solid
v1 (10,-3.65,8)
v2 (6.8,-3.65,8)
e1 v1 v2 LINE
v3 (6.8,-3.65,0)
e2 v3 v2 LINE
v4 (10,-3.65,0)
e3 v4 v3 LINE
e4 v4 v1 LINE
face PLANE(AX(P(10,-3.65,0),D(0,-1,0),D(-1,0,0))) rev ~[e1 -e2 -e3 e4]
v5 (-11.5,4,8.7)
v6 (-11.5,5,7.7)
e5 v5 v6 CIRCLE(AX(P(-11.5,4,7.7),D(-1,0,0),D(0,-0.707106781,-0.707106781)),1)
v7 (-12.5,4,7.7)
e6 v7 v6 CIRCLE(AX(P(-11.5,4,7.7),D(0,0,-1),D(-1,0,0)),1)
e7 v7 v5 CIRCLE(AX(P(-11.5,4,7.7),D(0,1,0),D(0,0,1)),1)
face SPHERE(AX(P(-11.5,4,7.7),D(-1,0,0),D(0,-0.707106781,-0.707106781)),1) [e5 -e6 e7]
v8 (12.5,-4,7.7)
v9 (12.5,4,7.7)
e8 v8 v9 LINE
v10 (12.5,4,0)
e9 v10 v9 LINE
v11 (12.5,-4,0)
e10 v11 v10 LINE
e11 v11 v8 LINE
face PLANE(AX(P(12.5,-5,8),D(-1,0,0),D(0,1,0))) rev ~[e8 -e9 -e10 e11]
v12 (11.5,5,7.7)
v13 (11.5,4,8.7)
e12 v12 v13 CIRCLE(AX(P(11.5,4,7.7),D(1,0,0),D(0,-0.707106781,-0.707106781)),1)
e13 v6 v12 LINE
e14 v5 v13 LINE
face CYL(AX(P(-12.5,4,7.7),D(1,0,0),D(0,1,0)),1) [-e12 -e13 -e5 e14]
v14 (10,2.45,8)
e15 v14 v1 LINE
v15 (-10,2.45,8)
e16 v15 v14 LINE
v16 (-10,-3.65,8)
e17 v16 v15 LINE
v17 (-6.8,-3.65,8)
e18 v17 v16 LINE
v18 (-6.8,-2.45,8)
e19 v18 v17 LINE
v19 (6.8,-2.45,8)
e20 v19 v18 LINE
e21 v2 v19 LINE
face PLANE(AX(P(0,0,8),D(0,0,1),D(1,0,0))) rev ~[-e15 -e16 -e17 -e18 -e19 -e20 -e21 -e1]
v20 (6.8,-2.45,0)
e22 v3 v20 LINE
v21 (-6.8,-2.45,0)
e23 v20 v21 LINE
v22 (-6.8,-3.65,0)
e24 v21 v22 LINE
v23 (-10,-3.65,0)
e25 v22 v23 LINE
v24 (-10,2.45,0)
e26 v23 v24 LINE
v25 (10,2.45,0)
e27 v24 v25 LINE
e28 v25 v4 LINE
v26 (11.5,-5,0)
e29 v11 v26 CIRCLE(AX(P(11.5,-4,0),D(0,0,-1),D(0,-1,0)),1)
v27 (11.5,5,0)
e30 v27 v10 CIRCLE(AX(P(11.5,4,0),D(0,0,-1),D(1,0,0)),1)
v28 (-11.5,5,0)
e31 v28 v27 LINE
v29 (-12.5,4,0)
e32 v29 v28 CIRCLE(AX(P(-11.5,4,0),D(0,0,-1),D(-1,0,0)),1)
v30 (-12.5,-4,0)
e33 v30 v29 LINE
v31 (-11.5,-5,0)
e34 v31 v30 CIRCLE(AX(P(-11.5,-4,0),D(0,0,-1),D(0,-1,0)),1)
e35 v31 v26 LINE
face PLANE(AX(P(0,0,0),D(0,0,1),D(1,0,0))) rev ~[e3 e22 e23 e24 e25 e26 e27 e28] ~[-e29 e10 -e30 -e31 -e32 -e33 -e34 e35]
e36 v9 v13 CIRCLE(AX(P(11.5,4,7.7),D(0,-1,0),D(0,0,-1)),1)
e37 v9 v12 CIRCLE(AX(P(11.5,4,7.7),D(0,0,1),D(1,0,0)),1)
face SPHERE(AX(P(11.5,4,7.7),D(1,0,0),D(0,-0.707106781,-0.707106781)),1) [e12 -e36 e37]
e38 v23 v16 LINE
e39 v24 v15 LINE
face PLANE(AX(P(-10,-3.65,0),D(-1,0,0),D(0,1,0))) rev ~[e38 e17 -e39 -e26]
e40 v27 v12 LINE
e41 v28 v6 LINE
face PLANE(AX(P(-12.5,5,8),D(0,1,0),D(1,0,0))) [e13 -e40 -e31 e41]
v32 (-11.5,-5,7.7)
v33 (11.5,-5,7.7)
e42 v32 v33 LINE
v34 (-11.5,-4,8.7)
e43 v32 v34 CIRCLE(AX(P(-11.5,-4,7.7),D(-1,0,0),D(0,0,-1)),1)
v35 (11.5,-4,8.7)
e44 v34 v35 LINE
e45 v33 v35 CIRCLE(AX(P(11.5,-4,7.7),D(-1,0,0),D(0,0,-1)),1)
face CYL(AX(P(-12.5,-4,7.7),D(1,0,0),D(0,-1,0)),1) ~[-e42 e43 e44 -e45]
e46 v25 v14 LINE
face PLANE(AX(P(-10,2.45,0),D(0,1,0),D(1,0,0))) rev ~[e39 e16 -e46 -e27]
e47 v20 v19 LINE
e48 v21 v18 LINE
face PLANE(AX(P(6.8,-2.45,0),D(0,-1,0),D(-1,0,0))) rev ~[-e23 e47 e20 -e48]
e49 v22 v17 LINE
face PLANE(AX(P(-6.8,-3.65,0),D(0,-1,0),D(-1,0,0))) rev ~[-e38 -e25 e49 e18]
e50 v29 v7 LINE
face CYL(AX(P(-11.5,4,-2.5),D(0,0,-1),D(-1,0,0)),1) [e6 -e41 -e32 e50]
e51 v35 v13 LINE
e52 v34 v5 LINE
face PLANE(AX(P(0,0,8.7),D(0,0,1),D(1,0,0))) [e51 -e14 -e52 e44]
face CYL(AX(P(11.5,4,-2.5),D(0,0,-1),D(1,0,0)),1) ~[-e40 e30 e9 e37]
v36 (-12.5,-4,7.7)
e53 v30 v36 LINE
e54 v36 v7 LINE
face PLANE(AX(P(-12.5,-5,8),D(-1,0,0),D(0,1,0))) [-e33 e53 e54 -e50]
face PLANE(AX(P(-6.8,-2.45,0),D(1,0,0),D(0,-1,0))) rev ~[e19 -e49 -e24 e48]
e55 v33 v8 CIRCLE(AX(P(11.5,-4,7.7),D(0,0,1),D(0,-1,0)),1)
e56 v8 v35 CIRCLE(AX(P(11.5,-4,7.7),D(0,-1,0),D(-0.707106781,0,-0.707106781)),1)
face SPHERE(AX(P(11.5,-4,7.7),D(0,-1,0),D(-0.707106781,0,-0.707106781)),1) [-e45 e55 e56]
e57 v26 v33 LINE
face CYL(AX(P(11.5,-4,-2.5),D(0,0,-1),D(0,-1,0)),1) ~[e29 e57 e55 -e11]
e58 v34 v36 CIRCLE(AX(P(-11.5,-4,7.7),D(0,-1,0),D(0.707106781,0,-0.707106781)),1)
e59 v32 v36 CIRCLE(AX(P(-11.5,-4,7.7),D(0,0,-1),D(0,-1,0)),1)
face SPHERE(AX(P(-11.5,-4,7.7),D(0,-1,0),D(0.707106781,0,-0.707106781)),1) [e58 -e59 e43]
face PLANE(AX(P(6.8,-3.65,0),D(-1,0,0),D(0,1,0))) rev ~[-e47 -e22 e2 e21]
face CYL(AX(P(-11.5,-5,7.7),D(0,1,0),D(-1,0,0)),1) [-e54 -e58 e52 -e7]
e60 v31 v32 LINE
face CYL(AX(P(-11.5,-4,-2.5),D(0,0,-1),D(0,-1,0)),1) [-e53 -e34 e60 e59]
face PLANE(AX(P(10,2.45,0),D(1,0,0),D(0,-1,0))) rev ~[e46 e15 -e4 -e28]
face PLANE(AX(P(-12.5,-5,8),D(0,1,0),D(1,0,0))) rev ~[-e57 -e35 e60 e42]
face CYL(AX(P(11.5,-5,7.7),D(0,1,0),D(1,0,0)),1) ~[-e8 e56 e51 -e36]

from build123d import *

# Parameters (mm, degrees)
F0_W         = 25
F0_H         = 10
F1_DEPTH     = 8
F2_W         = 25
F2_H         = 10
F3_DEPTH     = 0.7
F4_R         = 1
F5_T1_DEPTH  = 10.2
F5_S5_W      = 1
F5_S5_H      = 1
F5_T6_DEPTH  = 1
F6_T1_DEPTH  = 10.2
F6_S5_W      = 1
F6_S5_H      = 1
F6_T6_DEPTH  = 1
F6_S11_W     = 1
F6_S11_H     = 1
F6_T12_DEPTH = 1
F6_S17_W     = 1
F6_S17_H     = 1
F6_T18_DEPTH = 1


# Not quite as in the source:
# - a fillet or chamfer that OpenCascade refuses, or shapes differently, is made with other operations: its cross-section is extruded or revolved along the edge and cut away or added


with BuildPart() as f1:
    # F0 (on Top) → F1 (new body)
    with BuildSketch(Plane.XY):
        Rectangle(F0_W, F0_H)
        Polygon((-10, 2.45), (10, 2.45), (10, -2.45), (10, -3.65), (6.8, -3.65), (6.8, -2.45), (-6.8, -2.45), (-6.8, -3.65), (-10, -3.65), (-10, -2.45), align=None, mode=Mode.SUBTRACT)
    extrude(amount=F1_DEPTH)

    # F2 (on face) → F3 (join)
    with BuildSketch(Plane.XY.offset(8)):
        Rectangle(F2_W, F2_H)
    extrude(amount=F3_DEPTH)

    # F4
    f4_edges = [f1.edges().sort_by_distance(p)[0] for p in [
        (0, 5, 8.7),
        (-12.5, 0, 8.7),
        (0, -5, 8.7),
        (12.5, 0, 8.7),
    ]]
    fillet(f4_edges, radius=F4_R)

    # F5: fillet of radius 1 on 1 edges, made by hand

    # F5_s2 → F5_t1 (cut)
    with BuildSketch(Plane.XY.offset(-2.5)):
        with BuildLine():
            ThreePointArc((12.5, 4), (12.2071067812, 4.7071067812), (11.5, 5))
            Line((11.5, 5), (12.5, 5))
            Line((12.5, 5), (12.5, 4))
        make_face()
    extrude(amount=F5_T1_DEPTH, mode=Mode.SUBTRACT)


with BuildPart() as f5_tool4:
    # F5_s5 → F5_t6 (new body)
    with BuildSketch(Plane.YZ.offset(11.5)):
        with Locations((4.5, 8.2)):
            Rectangle(F5_S5_W, F5_S5_H)
    extrude(amount=F5_T6_DEPTH)

    # F5_s7 → F5_t8 (revolve, cut)
    with BuildSketch(Plane(origin=(11.5, 4, 7.7), x_dir=(0, -0.7071067812, -0.7071067812), z_dir=(0, -0.7071067812, 0.7071067812))):
        with BuildLine():
            ThreePointArc((0, -1), (1, 0), (0, 1))
            Line((0, 1), (0, -1))
        make_face()
    revolve(axis=Axis((11.5, 4, 7.7), (1, 0, 0)), mode=Mode.SUBTRACT)


with BuildPart() as f1_1:
    add(f1.part)

    # F5_t3: cut F5_tool4
    add(f5_tool4.part, mode=Mode.SUBTRACT)

    # F6: fillet of radius 1 on 3 edges, made by hand

    # F6_s2 → F6_t1 (cut)
    with BuildSketch(Plane.XY.offset(-2.5)):
        with BuildLine():
            ThreePointArc((-12.5, 4), (-12.2071067812, 4.7071067812), (-11.5, 5))
            Line((-11.5, 5), (-12.5, 5))
            Line((-12.5, 5), (-12.5, 4))
        make_face()
        with BuildLine():
            ThreePointArc((11.5, -5), (12.2071067812, -4.7071067812), (12.5, -4))
            Line((12.5, -4), (12.5, -5))
            Line((12.5, -5), (11.5, -5))
        make_face()
        with BuildLine():
            ThreePointArc((-11.5, -5), (-12.2071067812, -4.7071067812), (-12.5, -4))
            Line((-12.5, -4), (-12.5, -5))
            Line((-12.5, -5), (-11.5, -5))
        make_face()
    extrude(amount=F6_T1_DEPTH, mode=Mode.SUBTRACT)


with BuildPart() as f6_tool4:
    # F6_s5 → F6_t6 (new body)
    with BuildSketch(Plane.XZ.offset(4)):
        with Locations((-12, 8.2)):
            Rectangle(F6_S5_W, F6_S5_H)
    extrude(amount=F6_T6_DEPTH)

    # F6_s7 → F6_t8 (revolve, cut)
    with BuildSketch(Plane(origin=(-11.5, -4, 7.7), x_dir=(0.7071067812, 0, -0.7071067812), z_dir=(-0.7071067812, 0, -0.7071067812))):
        with BuildLine():
            ThreePointArc((0, -1), (1, 0), (0, 1))
            Line((0, 1), (0, -1))
        make_face()
    revolve(axis=Axis((-11.5, -4, 7.7), (0, -1, 0)), mode=Mode.SUBTRACT)


with BuildPart() as f1_2:
    add(f1_1.part)

    # F6_t3: cut F6_tool4
    add(f6_tool4.part, mode=Mode.SUBTRACT)


with BuildPart() as f6_tool10:
    # F6_s11 → F6_t12 (new body)
    with BuildSketch(Plane.XZ.offset(4)):
        with Locations((12, 8.2)):
            Rectangle(F6_S11_W, F6_S11_H)
    extrude(amount=F6_T12_DEPTH)

    # F6_s13 → F6_t14 (revolve, cut)
    with BuildSketch(Plane(origin=(11.5, -4, 7.7), x_dir=(-0.7071067812, 0, -0.7071067812), z_dir=(-0.7071067812, 0, 0.7071067812))):
        with BuildLine():
            ThreePointArc((0, -1), (1, 0), (0, 1))
            Line((0, 1), (0, -1))
        make_face()
    revolve(axis=Axis((11.5, -4, 7.7), (0, -1, 0)), mode=Mode.SUBTRACT)


with BuildPart() as f1_3:
    add(f1_2.part)

    # F6_t9: cut F6_tool10
    add(f6_tool10.part, mode=Mode.SUBTRACT)


with BuildPart() as f6_tool16:
    # F6_s17 → F6_t18 (new body)
    with BuildSketch(Plane.YZ.offset(-11.5)):
        with Locations((4.5, 8.2)):
            Rectangle(F6_S17_W, F6_S17_H)
    extrude(amount=-F6_T18_DEPTH)

    # F6_s19 → F6_t20 (revolve, cut)
    with BuildSketch(Plane(origin=(-11.5, 4, 7.7), x_dir=(0, -0.7071067812, -0.7071067812), z_dir=(0, 0.7071067812, -0.7071067812))):
        with BuildLine():
            ThreePointArc((0, -1), (1, 0), (0, 1))
            Line((0, 1), (0, -1))
        make_face()
    revolve(axis=Axis((-11.5, 4, 7.7), (-1, 0, 0)), mode=Mode.SUBTRACT)


with BuildPart() as f1_4:
    add(f1_3.part)

    # F6_t15: cut F6_tool16
    add(f6_tool16.part, mode=Mode.SUBTRACT)


solid = f1_4.part
